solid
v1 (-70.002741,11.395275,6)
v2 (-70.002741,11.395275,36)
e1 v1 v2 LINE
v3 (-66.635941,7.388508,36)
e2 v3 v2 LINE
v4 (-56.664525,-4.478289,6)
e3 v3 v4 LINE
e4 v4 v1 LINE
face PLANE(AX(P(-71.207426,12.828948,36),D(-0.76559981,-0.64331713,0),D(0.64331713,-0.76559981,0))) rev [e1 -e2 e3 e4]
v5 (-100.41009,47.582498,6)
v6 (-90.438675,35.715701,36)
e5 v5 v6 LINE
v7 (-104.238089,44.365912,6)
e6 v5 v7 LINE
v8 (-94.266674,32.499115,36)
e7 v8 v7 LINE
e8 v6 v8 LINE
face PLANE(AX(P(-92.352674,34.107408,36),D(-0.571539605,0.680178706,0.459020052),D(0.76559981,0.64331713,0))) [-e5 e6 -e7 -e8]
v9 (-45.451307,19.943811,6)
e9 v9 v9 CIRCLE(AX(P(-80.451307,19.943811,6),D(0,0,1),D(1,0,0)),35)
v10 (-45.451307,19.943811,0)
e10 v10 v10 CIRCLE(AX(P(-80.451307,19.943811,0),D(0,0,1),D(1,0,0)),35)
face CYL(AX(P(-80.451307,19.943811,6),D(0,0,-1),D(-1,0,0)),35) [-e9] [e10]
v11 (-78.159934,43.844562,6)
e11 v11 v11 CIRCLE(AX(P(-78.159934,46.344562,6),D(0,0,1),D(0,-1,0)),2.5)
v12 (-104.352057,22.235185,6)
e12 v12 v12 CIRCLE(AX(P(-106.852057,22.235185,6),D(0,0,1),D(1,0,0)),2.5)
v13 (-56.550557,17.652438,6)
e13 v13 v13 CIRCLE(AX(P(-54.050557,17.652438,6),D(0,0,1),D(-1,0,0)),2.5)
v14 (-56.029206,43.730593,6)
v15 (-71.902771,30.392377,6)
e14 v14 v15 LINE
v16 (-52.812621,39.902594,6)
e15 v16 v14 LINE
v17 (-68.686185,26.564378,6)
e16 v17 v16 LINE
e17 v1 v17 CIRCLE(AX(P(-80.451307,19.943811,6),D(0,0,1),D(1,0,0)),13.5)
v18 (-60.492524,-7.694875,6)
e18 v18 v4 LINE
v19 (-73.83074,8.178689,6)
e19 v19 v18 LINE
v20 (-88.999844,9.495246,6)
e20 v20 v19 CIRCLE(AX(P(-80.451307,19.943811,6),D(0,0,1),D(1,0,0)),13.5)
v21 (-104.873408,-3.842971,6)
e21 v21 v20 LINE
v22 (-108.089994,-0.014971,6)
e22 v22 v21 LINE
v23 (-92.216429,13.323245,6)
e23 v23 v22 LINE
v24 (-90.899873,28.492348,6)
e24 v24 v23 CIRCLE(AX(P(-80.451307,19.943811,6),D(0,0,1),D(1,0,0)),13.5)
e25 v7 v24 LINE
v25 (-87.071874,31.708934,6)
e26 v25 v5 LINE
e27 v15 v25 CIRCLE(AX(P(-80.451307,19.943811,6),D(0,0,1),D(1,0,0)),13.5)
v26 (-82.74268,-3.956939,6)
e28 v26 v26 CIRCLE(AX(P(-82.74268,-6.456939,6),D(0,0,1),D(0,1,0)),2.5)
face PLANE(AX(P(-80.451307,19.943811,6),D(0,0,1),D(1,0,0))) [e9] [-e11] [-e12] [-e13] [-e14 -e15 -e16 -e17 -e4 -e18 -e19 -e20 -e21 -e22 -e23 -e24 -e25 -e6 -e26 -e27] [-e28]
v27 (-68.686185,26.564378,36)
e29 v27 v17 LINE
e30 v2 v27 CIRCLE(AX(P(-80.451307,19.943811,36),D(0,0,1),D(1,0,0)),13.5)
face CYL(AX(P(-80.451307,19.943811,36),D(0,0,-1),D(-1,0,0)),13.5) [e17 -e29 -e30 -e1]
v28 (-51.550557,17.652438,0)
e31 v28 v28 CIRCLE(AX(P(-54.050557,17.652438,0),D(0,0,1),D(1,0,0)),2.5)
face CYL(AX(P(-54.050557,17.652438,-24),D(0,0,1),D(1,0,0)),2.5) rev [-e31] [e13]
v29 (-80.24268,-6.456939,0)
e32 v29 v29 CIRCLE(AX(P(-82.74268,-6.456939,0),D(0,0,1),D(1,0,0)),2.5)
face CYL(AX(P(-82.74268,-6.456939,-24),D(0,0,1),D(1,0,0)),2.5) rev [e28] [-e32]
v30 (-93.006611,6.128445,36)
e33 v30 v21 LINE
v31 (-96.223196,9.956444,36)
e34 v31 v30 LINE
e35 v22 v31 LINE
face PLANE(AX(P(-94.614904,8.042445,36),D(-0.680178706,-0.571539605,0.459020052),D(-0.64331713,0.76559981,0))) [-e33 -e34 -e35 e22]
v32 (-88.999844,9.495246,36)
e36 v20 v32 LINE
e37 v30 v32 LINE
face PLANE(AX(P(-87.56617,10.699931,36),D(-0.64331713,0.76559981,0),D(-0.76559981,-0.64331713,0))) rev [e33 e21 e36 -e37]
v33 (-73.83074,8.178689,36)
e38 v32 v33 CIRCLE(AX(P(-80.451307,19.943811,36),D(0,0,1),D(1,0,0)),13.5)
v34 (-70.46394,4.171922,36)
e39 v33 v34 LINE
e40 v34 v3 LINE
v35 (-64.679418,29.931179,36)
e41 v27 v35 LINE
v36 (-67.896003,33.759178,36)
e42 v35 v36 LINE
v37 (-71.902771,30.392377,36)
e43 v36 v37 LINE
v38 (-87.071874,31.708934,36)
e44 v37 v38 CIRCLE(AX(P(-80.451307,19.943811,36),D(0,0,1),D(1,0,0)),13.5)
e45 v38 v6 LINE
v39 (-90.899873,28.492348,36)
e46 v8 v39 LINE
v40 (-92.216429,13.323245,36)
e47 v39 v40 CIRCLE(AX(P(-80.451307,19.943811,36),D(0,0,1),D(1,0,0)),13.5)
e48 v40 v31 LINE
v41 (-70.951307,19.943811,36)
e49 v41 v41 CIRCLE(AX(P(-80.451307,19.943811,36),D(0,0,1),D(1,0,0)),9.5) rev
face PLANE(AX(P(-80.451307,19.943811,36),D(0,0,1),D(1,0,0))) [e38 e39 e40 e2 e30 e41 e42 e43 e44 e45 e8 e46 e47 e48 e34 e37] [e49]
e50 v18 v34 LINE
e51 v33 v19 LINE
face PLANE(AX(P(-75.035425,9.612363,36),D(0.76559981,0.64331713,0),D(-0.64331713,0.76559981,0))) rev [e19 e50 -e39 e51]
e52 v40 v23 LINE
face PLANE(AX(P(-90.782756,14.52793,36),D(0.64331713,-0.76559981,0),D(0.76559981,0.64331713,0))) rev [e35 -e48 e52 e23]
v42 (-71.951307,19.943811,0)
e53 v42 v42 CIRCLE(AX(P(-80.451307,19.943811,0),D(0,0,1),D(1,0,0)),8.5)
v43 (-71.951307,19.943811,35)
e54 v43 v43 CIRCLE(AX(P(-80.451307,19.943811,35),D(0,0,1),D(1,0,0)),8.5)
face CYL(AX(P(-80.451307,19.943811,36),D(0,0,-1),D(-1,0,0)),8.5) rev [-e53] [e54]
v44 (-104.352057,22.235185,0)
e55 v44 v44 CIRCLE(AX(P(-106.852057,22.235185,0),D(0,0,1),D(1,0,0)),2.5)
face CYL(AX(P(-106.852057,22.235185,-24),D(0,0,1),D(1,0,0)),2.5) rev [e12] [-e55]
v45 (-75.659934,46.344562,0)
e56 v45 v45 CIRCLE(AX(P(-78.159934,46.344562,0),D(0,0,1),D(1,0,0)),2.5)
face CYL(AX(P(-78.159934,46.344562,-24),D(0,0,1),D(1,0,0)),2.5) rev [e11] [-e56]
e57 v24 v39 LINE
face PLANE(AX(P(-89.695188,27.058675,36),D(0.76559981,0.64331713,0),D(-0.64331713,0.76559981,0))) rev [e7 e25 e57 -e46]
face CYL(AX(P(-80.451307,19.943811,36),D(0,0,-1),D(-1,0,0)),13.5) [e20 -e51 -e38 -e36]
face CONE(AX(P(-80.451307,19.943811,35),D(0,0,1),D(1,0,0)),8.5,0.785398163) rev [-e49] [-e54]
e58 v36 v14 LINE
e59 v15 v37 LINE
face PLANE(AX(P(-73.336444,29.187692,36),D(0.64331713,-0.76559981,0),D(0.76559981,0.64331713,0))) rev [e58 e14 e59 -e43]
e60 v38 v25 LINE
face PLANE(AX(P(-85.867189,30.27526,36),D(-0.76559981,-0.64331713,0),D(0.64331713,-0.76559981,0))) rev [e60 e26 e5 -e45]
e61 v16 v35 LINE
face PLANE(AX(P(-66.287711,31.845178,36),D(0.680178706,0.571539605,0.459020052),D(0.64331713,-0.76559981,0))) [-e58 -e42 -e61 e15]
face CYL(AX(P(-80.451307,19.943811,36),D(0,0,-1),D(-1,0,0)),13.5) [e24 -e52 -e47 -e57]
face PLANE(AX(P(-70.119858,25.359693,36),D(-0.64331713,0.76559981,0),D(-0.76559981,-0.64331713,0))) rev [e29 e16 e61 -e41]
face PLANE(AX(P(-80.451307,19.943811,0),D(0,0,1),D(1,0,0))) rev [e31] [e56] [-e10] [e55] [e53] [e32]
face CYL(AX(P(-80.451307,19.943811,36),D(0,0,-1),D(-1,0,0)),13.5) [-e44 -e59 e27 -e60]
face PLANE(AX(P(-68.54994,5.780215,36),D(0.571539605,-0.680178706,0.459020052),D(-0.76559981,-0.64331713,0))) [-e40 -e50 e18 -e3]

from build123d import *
from OCP.BRepFilletAPI import BRepFilletAPI_MakeChamfer

# Parameters (mm, degrees)
SKETCH1_R                      = 35
BOSS_EXTRUDE1_DEPTH            = 6
SKETCH2_R                      = 13.5
SKETCH2_R_2                    = 8.5
BOSS_EXTRUDE2_DEPTH            = 30
BOSS_EXTRUDE3_DEPTH            = 30
CHAMFER1_SIZE2                 = 30
CHAMFER1_SIZE                  = 15.5
CIRPATTERN2_COUNT              = 4
CHAMFER1_OF_CIRPATTERN2_SIZE   = 15.5
CHAMFER1_OF_CIRPATTERN2_SIZE_2 = 30
CUT_EXTRUDE1_START             = -30
SKETCH4_R                      = 8.5
CUT_EXTRUDE1_DEPTH             = 30
CHAMFER2_SIZE                  = 1
SKETCH5_R                      = 2.5
CUT_EXTRUDE2_DEPTH             = 30
CIRPATTERN3_COUNT              = 4


with BuildPart() as part:
    # Sketch1 → Boss-Extrude1 (new body)
    with BuildSketch(Plane.XY):
        with Locations((-80.451307138, 19.943811433)):
            Circle(SKETCH1_R)
    extrude(amount=BOSS_EXTRUDE1_DEPTH)

    # Sketch2 → Boss-Extrude2 (add)
    with BuildSketch(Plane.XY.offset(6)):
        with Locations((-80.451307138, 19.943811433)):
            Circle(SKETCH2_R)
        with Locations((-80.451307138, 19.943811433)):
            Circle(SKETCH2_R_2, mode=Mode.SUBTRACT)
    extrude(amount=BOSS_EXTRUDE2_DEPTH)

    # Sketch3 → Boss-Extrude3 (add)
    with BuildSketch(Plane.XY.offset(6)):
        Polygon((-75.035425389, 9.612362561), (-71.207426337, 12.828948213), (-56.664525181, -4.478289297), (-60.492524233, -7.694874949), align=None)
    boss_extrude3 = extrude(amount=BOSS_EXTRUDE3_DEPTH)

    # Chamfer1
    chamfer1_edges = [part.edges().sort_by_distance(p)[0] for p in [
        (-58.578524707, -6.086582123, 36),
    ]]
    chamfer1_side = [part.faces().sort_by_distance(p)[0] for p in [
        (-58.777953017, -5.849246182, 36),
    ]]
    chamfer(chamfer1_edges, length=CHAMFER1_SIZE - 0.0001, length2=CHAMFER1_SIZE2 - 0.0001, reference=chamfer1_side[0])  # a hair under: the kernel refuses the full size

    # CirPattern2: Boss-Extrude3 ×4 about axis
    cirpattern2_axis = Axis((-80.451307138, 19.943811433, 0), (0, 0, 1))
    for i in range(1, CIRPATTERN2_COUNT):
        add(boss_extrude3.rotate(cirpattern2_axis, i * 360 / CIRPATTERN2_COUNT))

    # Chamfer1 of CirPattern2
    chamfer1_of_cirpattern2_edges_1 = [part.edges().sort_by_distance(p)[0] for p in [
        (-54.420913581, 41.816593865, 36),
    ]]
    chamfer1_of_cirpattern2_side_1 = [part.faces().sort_by_distance(p)[0] for p in [
        (-54.658249523, 41.617165554, 36),
    ]]
    chamfer1_of_cirpattern2_edges_2 = [part.edges().sort_by_distance(p)[0] for p in [
        (-102.324089569, 45.97420499, 36),
    ]]
    chamfer1_of_cirpattern2_side_2 = [part.faces().sort_by_distance(p)[0] for p in [
        (-102.124661259, 45.736869049, 36),
    ]]
    chamfer1_of_cirpattern2_edges_3 = [part.edges().sort_by_distance(p)[0] for p in [
        (-106.481700695, -1.928970998, 36),
    ]]
    chamfer1_of_cirpattern2_side_3 = [part.faces().sort_by_distance(p)[0] for p in [
        (-106.244364753, -1.729542687, 36),
    ]]
    chamfer1_of_cirpattern2 = BRepFilletAPI_MakeChamfer(part.part.solid().wrapped)
    for e in chamfer1_of_cirpattern2_edges_1:
        chamfer1_of_cirpattern2.Add(CHAMFER1_OF_CIRPATTERN2_SIZE - 0.0001, CHAMFER1_OF_CIRPATTERN2_SIZE_2 - 0.0001, e.wrapped, chamfer1_of_cirpattern2_side_1[0].wrapped)
    for e in chamfer1_of_cirpattern2_edges_2:
        chamfer1_of_cirpattern2.Add(CHAMFER1_OF_CIRPATTERN2_SIZE - 0.0001, CHAMFER1_OF_CIRPATTERN2_SIZE_2 - 0.0001, e.wrapped, chamfer1_of_cirpattern2_side_2[0].wrapped)
    for e in chamfer1_of_cirpattern2_edges_3:
        chamfer1_of_cirpattern2.Add(CHAMFER1_OF_CIRPATTERN2_SIZE - 0.0001, CHAMFER1_OF_CIRPATTERN2_SIZE_2 - 0.0001, e.wrapped, chamfer1_of_cirpattern2_side_3[0].wrapped)
    add(Compound.cast(chamfer1_of_cirpattern2.Shape()), mode=Mode.REPLACE)  # a hair under: the kernel refuses the full size

    # Sketch4 → Cut-Extrude1 (cut)
    with BuildSketch(Plane.XY.offset(6).offset(CUT_EXTRUDE1_START)):
        with Locations((-80.451307138, 19.943811433)):
            Circle(SKETCH4_R)
    extrude(amount=CUT_EXTRUDE1_DEPTH, mode=Mode.SUBTRACT)

    # Chamfer2
    chamfer2_edges = [part.edges().sort_by_distance(p)[0] for p in [
        (-88.951307138, 19.943811433, 36),
    ]]
    chamfer(chamfer2_edges, length=CHAMFER2_SIZE)

    # Sketch5 → Cut-Extrude2 (cut)
    with BuildSketch(Plane.XY.offset(6)):
        with Locations((-106.852057297, 22.235184611)):
            Circle(SKETCH5_R)
    cut_extrude2 = extrude(amount=-CUT_EXTRUDE2_DEPTH, mode=Mode.SUBTRACT)

    # CirPattern3: Cut-Extrude2 ×4 about axis
    cirpattern3_axis = Axis((-80.451307138, 19.943811433, 0), (0, 0, 1))
    for i in range(1, CIRPATTERN3_COUNT):
        add(cut_extrude2.rotate(cirpattern3_axis, i * 360 / CIRPATTERN3_COUNT), mode=Mode.SUBTRACT)


solid = part.part
